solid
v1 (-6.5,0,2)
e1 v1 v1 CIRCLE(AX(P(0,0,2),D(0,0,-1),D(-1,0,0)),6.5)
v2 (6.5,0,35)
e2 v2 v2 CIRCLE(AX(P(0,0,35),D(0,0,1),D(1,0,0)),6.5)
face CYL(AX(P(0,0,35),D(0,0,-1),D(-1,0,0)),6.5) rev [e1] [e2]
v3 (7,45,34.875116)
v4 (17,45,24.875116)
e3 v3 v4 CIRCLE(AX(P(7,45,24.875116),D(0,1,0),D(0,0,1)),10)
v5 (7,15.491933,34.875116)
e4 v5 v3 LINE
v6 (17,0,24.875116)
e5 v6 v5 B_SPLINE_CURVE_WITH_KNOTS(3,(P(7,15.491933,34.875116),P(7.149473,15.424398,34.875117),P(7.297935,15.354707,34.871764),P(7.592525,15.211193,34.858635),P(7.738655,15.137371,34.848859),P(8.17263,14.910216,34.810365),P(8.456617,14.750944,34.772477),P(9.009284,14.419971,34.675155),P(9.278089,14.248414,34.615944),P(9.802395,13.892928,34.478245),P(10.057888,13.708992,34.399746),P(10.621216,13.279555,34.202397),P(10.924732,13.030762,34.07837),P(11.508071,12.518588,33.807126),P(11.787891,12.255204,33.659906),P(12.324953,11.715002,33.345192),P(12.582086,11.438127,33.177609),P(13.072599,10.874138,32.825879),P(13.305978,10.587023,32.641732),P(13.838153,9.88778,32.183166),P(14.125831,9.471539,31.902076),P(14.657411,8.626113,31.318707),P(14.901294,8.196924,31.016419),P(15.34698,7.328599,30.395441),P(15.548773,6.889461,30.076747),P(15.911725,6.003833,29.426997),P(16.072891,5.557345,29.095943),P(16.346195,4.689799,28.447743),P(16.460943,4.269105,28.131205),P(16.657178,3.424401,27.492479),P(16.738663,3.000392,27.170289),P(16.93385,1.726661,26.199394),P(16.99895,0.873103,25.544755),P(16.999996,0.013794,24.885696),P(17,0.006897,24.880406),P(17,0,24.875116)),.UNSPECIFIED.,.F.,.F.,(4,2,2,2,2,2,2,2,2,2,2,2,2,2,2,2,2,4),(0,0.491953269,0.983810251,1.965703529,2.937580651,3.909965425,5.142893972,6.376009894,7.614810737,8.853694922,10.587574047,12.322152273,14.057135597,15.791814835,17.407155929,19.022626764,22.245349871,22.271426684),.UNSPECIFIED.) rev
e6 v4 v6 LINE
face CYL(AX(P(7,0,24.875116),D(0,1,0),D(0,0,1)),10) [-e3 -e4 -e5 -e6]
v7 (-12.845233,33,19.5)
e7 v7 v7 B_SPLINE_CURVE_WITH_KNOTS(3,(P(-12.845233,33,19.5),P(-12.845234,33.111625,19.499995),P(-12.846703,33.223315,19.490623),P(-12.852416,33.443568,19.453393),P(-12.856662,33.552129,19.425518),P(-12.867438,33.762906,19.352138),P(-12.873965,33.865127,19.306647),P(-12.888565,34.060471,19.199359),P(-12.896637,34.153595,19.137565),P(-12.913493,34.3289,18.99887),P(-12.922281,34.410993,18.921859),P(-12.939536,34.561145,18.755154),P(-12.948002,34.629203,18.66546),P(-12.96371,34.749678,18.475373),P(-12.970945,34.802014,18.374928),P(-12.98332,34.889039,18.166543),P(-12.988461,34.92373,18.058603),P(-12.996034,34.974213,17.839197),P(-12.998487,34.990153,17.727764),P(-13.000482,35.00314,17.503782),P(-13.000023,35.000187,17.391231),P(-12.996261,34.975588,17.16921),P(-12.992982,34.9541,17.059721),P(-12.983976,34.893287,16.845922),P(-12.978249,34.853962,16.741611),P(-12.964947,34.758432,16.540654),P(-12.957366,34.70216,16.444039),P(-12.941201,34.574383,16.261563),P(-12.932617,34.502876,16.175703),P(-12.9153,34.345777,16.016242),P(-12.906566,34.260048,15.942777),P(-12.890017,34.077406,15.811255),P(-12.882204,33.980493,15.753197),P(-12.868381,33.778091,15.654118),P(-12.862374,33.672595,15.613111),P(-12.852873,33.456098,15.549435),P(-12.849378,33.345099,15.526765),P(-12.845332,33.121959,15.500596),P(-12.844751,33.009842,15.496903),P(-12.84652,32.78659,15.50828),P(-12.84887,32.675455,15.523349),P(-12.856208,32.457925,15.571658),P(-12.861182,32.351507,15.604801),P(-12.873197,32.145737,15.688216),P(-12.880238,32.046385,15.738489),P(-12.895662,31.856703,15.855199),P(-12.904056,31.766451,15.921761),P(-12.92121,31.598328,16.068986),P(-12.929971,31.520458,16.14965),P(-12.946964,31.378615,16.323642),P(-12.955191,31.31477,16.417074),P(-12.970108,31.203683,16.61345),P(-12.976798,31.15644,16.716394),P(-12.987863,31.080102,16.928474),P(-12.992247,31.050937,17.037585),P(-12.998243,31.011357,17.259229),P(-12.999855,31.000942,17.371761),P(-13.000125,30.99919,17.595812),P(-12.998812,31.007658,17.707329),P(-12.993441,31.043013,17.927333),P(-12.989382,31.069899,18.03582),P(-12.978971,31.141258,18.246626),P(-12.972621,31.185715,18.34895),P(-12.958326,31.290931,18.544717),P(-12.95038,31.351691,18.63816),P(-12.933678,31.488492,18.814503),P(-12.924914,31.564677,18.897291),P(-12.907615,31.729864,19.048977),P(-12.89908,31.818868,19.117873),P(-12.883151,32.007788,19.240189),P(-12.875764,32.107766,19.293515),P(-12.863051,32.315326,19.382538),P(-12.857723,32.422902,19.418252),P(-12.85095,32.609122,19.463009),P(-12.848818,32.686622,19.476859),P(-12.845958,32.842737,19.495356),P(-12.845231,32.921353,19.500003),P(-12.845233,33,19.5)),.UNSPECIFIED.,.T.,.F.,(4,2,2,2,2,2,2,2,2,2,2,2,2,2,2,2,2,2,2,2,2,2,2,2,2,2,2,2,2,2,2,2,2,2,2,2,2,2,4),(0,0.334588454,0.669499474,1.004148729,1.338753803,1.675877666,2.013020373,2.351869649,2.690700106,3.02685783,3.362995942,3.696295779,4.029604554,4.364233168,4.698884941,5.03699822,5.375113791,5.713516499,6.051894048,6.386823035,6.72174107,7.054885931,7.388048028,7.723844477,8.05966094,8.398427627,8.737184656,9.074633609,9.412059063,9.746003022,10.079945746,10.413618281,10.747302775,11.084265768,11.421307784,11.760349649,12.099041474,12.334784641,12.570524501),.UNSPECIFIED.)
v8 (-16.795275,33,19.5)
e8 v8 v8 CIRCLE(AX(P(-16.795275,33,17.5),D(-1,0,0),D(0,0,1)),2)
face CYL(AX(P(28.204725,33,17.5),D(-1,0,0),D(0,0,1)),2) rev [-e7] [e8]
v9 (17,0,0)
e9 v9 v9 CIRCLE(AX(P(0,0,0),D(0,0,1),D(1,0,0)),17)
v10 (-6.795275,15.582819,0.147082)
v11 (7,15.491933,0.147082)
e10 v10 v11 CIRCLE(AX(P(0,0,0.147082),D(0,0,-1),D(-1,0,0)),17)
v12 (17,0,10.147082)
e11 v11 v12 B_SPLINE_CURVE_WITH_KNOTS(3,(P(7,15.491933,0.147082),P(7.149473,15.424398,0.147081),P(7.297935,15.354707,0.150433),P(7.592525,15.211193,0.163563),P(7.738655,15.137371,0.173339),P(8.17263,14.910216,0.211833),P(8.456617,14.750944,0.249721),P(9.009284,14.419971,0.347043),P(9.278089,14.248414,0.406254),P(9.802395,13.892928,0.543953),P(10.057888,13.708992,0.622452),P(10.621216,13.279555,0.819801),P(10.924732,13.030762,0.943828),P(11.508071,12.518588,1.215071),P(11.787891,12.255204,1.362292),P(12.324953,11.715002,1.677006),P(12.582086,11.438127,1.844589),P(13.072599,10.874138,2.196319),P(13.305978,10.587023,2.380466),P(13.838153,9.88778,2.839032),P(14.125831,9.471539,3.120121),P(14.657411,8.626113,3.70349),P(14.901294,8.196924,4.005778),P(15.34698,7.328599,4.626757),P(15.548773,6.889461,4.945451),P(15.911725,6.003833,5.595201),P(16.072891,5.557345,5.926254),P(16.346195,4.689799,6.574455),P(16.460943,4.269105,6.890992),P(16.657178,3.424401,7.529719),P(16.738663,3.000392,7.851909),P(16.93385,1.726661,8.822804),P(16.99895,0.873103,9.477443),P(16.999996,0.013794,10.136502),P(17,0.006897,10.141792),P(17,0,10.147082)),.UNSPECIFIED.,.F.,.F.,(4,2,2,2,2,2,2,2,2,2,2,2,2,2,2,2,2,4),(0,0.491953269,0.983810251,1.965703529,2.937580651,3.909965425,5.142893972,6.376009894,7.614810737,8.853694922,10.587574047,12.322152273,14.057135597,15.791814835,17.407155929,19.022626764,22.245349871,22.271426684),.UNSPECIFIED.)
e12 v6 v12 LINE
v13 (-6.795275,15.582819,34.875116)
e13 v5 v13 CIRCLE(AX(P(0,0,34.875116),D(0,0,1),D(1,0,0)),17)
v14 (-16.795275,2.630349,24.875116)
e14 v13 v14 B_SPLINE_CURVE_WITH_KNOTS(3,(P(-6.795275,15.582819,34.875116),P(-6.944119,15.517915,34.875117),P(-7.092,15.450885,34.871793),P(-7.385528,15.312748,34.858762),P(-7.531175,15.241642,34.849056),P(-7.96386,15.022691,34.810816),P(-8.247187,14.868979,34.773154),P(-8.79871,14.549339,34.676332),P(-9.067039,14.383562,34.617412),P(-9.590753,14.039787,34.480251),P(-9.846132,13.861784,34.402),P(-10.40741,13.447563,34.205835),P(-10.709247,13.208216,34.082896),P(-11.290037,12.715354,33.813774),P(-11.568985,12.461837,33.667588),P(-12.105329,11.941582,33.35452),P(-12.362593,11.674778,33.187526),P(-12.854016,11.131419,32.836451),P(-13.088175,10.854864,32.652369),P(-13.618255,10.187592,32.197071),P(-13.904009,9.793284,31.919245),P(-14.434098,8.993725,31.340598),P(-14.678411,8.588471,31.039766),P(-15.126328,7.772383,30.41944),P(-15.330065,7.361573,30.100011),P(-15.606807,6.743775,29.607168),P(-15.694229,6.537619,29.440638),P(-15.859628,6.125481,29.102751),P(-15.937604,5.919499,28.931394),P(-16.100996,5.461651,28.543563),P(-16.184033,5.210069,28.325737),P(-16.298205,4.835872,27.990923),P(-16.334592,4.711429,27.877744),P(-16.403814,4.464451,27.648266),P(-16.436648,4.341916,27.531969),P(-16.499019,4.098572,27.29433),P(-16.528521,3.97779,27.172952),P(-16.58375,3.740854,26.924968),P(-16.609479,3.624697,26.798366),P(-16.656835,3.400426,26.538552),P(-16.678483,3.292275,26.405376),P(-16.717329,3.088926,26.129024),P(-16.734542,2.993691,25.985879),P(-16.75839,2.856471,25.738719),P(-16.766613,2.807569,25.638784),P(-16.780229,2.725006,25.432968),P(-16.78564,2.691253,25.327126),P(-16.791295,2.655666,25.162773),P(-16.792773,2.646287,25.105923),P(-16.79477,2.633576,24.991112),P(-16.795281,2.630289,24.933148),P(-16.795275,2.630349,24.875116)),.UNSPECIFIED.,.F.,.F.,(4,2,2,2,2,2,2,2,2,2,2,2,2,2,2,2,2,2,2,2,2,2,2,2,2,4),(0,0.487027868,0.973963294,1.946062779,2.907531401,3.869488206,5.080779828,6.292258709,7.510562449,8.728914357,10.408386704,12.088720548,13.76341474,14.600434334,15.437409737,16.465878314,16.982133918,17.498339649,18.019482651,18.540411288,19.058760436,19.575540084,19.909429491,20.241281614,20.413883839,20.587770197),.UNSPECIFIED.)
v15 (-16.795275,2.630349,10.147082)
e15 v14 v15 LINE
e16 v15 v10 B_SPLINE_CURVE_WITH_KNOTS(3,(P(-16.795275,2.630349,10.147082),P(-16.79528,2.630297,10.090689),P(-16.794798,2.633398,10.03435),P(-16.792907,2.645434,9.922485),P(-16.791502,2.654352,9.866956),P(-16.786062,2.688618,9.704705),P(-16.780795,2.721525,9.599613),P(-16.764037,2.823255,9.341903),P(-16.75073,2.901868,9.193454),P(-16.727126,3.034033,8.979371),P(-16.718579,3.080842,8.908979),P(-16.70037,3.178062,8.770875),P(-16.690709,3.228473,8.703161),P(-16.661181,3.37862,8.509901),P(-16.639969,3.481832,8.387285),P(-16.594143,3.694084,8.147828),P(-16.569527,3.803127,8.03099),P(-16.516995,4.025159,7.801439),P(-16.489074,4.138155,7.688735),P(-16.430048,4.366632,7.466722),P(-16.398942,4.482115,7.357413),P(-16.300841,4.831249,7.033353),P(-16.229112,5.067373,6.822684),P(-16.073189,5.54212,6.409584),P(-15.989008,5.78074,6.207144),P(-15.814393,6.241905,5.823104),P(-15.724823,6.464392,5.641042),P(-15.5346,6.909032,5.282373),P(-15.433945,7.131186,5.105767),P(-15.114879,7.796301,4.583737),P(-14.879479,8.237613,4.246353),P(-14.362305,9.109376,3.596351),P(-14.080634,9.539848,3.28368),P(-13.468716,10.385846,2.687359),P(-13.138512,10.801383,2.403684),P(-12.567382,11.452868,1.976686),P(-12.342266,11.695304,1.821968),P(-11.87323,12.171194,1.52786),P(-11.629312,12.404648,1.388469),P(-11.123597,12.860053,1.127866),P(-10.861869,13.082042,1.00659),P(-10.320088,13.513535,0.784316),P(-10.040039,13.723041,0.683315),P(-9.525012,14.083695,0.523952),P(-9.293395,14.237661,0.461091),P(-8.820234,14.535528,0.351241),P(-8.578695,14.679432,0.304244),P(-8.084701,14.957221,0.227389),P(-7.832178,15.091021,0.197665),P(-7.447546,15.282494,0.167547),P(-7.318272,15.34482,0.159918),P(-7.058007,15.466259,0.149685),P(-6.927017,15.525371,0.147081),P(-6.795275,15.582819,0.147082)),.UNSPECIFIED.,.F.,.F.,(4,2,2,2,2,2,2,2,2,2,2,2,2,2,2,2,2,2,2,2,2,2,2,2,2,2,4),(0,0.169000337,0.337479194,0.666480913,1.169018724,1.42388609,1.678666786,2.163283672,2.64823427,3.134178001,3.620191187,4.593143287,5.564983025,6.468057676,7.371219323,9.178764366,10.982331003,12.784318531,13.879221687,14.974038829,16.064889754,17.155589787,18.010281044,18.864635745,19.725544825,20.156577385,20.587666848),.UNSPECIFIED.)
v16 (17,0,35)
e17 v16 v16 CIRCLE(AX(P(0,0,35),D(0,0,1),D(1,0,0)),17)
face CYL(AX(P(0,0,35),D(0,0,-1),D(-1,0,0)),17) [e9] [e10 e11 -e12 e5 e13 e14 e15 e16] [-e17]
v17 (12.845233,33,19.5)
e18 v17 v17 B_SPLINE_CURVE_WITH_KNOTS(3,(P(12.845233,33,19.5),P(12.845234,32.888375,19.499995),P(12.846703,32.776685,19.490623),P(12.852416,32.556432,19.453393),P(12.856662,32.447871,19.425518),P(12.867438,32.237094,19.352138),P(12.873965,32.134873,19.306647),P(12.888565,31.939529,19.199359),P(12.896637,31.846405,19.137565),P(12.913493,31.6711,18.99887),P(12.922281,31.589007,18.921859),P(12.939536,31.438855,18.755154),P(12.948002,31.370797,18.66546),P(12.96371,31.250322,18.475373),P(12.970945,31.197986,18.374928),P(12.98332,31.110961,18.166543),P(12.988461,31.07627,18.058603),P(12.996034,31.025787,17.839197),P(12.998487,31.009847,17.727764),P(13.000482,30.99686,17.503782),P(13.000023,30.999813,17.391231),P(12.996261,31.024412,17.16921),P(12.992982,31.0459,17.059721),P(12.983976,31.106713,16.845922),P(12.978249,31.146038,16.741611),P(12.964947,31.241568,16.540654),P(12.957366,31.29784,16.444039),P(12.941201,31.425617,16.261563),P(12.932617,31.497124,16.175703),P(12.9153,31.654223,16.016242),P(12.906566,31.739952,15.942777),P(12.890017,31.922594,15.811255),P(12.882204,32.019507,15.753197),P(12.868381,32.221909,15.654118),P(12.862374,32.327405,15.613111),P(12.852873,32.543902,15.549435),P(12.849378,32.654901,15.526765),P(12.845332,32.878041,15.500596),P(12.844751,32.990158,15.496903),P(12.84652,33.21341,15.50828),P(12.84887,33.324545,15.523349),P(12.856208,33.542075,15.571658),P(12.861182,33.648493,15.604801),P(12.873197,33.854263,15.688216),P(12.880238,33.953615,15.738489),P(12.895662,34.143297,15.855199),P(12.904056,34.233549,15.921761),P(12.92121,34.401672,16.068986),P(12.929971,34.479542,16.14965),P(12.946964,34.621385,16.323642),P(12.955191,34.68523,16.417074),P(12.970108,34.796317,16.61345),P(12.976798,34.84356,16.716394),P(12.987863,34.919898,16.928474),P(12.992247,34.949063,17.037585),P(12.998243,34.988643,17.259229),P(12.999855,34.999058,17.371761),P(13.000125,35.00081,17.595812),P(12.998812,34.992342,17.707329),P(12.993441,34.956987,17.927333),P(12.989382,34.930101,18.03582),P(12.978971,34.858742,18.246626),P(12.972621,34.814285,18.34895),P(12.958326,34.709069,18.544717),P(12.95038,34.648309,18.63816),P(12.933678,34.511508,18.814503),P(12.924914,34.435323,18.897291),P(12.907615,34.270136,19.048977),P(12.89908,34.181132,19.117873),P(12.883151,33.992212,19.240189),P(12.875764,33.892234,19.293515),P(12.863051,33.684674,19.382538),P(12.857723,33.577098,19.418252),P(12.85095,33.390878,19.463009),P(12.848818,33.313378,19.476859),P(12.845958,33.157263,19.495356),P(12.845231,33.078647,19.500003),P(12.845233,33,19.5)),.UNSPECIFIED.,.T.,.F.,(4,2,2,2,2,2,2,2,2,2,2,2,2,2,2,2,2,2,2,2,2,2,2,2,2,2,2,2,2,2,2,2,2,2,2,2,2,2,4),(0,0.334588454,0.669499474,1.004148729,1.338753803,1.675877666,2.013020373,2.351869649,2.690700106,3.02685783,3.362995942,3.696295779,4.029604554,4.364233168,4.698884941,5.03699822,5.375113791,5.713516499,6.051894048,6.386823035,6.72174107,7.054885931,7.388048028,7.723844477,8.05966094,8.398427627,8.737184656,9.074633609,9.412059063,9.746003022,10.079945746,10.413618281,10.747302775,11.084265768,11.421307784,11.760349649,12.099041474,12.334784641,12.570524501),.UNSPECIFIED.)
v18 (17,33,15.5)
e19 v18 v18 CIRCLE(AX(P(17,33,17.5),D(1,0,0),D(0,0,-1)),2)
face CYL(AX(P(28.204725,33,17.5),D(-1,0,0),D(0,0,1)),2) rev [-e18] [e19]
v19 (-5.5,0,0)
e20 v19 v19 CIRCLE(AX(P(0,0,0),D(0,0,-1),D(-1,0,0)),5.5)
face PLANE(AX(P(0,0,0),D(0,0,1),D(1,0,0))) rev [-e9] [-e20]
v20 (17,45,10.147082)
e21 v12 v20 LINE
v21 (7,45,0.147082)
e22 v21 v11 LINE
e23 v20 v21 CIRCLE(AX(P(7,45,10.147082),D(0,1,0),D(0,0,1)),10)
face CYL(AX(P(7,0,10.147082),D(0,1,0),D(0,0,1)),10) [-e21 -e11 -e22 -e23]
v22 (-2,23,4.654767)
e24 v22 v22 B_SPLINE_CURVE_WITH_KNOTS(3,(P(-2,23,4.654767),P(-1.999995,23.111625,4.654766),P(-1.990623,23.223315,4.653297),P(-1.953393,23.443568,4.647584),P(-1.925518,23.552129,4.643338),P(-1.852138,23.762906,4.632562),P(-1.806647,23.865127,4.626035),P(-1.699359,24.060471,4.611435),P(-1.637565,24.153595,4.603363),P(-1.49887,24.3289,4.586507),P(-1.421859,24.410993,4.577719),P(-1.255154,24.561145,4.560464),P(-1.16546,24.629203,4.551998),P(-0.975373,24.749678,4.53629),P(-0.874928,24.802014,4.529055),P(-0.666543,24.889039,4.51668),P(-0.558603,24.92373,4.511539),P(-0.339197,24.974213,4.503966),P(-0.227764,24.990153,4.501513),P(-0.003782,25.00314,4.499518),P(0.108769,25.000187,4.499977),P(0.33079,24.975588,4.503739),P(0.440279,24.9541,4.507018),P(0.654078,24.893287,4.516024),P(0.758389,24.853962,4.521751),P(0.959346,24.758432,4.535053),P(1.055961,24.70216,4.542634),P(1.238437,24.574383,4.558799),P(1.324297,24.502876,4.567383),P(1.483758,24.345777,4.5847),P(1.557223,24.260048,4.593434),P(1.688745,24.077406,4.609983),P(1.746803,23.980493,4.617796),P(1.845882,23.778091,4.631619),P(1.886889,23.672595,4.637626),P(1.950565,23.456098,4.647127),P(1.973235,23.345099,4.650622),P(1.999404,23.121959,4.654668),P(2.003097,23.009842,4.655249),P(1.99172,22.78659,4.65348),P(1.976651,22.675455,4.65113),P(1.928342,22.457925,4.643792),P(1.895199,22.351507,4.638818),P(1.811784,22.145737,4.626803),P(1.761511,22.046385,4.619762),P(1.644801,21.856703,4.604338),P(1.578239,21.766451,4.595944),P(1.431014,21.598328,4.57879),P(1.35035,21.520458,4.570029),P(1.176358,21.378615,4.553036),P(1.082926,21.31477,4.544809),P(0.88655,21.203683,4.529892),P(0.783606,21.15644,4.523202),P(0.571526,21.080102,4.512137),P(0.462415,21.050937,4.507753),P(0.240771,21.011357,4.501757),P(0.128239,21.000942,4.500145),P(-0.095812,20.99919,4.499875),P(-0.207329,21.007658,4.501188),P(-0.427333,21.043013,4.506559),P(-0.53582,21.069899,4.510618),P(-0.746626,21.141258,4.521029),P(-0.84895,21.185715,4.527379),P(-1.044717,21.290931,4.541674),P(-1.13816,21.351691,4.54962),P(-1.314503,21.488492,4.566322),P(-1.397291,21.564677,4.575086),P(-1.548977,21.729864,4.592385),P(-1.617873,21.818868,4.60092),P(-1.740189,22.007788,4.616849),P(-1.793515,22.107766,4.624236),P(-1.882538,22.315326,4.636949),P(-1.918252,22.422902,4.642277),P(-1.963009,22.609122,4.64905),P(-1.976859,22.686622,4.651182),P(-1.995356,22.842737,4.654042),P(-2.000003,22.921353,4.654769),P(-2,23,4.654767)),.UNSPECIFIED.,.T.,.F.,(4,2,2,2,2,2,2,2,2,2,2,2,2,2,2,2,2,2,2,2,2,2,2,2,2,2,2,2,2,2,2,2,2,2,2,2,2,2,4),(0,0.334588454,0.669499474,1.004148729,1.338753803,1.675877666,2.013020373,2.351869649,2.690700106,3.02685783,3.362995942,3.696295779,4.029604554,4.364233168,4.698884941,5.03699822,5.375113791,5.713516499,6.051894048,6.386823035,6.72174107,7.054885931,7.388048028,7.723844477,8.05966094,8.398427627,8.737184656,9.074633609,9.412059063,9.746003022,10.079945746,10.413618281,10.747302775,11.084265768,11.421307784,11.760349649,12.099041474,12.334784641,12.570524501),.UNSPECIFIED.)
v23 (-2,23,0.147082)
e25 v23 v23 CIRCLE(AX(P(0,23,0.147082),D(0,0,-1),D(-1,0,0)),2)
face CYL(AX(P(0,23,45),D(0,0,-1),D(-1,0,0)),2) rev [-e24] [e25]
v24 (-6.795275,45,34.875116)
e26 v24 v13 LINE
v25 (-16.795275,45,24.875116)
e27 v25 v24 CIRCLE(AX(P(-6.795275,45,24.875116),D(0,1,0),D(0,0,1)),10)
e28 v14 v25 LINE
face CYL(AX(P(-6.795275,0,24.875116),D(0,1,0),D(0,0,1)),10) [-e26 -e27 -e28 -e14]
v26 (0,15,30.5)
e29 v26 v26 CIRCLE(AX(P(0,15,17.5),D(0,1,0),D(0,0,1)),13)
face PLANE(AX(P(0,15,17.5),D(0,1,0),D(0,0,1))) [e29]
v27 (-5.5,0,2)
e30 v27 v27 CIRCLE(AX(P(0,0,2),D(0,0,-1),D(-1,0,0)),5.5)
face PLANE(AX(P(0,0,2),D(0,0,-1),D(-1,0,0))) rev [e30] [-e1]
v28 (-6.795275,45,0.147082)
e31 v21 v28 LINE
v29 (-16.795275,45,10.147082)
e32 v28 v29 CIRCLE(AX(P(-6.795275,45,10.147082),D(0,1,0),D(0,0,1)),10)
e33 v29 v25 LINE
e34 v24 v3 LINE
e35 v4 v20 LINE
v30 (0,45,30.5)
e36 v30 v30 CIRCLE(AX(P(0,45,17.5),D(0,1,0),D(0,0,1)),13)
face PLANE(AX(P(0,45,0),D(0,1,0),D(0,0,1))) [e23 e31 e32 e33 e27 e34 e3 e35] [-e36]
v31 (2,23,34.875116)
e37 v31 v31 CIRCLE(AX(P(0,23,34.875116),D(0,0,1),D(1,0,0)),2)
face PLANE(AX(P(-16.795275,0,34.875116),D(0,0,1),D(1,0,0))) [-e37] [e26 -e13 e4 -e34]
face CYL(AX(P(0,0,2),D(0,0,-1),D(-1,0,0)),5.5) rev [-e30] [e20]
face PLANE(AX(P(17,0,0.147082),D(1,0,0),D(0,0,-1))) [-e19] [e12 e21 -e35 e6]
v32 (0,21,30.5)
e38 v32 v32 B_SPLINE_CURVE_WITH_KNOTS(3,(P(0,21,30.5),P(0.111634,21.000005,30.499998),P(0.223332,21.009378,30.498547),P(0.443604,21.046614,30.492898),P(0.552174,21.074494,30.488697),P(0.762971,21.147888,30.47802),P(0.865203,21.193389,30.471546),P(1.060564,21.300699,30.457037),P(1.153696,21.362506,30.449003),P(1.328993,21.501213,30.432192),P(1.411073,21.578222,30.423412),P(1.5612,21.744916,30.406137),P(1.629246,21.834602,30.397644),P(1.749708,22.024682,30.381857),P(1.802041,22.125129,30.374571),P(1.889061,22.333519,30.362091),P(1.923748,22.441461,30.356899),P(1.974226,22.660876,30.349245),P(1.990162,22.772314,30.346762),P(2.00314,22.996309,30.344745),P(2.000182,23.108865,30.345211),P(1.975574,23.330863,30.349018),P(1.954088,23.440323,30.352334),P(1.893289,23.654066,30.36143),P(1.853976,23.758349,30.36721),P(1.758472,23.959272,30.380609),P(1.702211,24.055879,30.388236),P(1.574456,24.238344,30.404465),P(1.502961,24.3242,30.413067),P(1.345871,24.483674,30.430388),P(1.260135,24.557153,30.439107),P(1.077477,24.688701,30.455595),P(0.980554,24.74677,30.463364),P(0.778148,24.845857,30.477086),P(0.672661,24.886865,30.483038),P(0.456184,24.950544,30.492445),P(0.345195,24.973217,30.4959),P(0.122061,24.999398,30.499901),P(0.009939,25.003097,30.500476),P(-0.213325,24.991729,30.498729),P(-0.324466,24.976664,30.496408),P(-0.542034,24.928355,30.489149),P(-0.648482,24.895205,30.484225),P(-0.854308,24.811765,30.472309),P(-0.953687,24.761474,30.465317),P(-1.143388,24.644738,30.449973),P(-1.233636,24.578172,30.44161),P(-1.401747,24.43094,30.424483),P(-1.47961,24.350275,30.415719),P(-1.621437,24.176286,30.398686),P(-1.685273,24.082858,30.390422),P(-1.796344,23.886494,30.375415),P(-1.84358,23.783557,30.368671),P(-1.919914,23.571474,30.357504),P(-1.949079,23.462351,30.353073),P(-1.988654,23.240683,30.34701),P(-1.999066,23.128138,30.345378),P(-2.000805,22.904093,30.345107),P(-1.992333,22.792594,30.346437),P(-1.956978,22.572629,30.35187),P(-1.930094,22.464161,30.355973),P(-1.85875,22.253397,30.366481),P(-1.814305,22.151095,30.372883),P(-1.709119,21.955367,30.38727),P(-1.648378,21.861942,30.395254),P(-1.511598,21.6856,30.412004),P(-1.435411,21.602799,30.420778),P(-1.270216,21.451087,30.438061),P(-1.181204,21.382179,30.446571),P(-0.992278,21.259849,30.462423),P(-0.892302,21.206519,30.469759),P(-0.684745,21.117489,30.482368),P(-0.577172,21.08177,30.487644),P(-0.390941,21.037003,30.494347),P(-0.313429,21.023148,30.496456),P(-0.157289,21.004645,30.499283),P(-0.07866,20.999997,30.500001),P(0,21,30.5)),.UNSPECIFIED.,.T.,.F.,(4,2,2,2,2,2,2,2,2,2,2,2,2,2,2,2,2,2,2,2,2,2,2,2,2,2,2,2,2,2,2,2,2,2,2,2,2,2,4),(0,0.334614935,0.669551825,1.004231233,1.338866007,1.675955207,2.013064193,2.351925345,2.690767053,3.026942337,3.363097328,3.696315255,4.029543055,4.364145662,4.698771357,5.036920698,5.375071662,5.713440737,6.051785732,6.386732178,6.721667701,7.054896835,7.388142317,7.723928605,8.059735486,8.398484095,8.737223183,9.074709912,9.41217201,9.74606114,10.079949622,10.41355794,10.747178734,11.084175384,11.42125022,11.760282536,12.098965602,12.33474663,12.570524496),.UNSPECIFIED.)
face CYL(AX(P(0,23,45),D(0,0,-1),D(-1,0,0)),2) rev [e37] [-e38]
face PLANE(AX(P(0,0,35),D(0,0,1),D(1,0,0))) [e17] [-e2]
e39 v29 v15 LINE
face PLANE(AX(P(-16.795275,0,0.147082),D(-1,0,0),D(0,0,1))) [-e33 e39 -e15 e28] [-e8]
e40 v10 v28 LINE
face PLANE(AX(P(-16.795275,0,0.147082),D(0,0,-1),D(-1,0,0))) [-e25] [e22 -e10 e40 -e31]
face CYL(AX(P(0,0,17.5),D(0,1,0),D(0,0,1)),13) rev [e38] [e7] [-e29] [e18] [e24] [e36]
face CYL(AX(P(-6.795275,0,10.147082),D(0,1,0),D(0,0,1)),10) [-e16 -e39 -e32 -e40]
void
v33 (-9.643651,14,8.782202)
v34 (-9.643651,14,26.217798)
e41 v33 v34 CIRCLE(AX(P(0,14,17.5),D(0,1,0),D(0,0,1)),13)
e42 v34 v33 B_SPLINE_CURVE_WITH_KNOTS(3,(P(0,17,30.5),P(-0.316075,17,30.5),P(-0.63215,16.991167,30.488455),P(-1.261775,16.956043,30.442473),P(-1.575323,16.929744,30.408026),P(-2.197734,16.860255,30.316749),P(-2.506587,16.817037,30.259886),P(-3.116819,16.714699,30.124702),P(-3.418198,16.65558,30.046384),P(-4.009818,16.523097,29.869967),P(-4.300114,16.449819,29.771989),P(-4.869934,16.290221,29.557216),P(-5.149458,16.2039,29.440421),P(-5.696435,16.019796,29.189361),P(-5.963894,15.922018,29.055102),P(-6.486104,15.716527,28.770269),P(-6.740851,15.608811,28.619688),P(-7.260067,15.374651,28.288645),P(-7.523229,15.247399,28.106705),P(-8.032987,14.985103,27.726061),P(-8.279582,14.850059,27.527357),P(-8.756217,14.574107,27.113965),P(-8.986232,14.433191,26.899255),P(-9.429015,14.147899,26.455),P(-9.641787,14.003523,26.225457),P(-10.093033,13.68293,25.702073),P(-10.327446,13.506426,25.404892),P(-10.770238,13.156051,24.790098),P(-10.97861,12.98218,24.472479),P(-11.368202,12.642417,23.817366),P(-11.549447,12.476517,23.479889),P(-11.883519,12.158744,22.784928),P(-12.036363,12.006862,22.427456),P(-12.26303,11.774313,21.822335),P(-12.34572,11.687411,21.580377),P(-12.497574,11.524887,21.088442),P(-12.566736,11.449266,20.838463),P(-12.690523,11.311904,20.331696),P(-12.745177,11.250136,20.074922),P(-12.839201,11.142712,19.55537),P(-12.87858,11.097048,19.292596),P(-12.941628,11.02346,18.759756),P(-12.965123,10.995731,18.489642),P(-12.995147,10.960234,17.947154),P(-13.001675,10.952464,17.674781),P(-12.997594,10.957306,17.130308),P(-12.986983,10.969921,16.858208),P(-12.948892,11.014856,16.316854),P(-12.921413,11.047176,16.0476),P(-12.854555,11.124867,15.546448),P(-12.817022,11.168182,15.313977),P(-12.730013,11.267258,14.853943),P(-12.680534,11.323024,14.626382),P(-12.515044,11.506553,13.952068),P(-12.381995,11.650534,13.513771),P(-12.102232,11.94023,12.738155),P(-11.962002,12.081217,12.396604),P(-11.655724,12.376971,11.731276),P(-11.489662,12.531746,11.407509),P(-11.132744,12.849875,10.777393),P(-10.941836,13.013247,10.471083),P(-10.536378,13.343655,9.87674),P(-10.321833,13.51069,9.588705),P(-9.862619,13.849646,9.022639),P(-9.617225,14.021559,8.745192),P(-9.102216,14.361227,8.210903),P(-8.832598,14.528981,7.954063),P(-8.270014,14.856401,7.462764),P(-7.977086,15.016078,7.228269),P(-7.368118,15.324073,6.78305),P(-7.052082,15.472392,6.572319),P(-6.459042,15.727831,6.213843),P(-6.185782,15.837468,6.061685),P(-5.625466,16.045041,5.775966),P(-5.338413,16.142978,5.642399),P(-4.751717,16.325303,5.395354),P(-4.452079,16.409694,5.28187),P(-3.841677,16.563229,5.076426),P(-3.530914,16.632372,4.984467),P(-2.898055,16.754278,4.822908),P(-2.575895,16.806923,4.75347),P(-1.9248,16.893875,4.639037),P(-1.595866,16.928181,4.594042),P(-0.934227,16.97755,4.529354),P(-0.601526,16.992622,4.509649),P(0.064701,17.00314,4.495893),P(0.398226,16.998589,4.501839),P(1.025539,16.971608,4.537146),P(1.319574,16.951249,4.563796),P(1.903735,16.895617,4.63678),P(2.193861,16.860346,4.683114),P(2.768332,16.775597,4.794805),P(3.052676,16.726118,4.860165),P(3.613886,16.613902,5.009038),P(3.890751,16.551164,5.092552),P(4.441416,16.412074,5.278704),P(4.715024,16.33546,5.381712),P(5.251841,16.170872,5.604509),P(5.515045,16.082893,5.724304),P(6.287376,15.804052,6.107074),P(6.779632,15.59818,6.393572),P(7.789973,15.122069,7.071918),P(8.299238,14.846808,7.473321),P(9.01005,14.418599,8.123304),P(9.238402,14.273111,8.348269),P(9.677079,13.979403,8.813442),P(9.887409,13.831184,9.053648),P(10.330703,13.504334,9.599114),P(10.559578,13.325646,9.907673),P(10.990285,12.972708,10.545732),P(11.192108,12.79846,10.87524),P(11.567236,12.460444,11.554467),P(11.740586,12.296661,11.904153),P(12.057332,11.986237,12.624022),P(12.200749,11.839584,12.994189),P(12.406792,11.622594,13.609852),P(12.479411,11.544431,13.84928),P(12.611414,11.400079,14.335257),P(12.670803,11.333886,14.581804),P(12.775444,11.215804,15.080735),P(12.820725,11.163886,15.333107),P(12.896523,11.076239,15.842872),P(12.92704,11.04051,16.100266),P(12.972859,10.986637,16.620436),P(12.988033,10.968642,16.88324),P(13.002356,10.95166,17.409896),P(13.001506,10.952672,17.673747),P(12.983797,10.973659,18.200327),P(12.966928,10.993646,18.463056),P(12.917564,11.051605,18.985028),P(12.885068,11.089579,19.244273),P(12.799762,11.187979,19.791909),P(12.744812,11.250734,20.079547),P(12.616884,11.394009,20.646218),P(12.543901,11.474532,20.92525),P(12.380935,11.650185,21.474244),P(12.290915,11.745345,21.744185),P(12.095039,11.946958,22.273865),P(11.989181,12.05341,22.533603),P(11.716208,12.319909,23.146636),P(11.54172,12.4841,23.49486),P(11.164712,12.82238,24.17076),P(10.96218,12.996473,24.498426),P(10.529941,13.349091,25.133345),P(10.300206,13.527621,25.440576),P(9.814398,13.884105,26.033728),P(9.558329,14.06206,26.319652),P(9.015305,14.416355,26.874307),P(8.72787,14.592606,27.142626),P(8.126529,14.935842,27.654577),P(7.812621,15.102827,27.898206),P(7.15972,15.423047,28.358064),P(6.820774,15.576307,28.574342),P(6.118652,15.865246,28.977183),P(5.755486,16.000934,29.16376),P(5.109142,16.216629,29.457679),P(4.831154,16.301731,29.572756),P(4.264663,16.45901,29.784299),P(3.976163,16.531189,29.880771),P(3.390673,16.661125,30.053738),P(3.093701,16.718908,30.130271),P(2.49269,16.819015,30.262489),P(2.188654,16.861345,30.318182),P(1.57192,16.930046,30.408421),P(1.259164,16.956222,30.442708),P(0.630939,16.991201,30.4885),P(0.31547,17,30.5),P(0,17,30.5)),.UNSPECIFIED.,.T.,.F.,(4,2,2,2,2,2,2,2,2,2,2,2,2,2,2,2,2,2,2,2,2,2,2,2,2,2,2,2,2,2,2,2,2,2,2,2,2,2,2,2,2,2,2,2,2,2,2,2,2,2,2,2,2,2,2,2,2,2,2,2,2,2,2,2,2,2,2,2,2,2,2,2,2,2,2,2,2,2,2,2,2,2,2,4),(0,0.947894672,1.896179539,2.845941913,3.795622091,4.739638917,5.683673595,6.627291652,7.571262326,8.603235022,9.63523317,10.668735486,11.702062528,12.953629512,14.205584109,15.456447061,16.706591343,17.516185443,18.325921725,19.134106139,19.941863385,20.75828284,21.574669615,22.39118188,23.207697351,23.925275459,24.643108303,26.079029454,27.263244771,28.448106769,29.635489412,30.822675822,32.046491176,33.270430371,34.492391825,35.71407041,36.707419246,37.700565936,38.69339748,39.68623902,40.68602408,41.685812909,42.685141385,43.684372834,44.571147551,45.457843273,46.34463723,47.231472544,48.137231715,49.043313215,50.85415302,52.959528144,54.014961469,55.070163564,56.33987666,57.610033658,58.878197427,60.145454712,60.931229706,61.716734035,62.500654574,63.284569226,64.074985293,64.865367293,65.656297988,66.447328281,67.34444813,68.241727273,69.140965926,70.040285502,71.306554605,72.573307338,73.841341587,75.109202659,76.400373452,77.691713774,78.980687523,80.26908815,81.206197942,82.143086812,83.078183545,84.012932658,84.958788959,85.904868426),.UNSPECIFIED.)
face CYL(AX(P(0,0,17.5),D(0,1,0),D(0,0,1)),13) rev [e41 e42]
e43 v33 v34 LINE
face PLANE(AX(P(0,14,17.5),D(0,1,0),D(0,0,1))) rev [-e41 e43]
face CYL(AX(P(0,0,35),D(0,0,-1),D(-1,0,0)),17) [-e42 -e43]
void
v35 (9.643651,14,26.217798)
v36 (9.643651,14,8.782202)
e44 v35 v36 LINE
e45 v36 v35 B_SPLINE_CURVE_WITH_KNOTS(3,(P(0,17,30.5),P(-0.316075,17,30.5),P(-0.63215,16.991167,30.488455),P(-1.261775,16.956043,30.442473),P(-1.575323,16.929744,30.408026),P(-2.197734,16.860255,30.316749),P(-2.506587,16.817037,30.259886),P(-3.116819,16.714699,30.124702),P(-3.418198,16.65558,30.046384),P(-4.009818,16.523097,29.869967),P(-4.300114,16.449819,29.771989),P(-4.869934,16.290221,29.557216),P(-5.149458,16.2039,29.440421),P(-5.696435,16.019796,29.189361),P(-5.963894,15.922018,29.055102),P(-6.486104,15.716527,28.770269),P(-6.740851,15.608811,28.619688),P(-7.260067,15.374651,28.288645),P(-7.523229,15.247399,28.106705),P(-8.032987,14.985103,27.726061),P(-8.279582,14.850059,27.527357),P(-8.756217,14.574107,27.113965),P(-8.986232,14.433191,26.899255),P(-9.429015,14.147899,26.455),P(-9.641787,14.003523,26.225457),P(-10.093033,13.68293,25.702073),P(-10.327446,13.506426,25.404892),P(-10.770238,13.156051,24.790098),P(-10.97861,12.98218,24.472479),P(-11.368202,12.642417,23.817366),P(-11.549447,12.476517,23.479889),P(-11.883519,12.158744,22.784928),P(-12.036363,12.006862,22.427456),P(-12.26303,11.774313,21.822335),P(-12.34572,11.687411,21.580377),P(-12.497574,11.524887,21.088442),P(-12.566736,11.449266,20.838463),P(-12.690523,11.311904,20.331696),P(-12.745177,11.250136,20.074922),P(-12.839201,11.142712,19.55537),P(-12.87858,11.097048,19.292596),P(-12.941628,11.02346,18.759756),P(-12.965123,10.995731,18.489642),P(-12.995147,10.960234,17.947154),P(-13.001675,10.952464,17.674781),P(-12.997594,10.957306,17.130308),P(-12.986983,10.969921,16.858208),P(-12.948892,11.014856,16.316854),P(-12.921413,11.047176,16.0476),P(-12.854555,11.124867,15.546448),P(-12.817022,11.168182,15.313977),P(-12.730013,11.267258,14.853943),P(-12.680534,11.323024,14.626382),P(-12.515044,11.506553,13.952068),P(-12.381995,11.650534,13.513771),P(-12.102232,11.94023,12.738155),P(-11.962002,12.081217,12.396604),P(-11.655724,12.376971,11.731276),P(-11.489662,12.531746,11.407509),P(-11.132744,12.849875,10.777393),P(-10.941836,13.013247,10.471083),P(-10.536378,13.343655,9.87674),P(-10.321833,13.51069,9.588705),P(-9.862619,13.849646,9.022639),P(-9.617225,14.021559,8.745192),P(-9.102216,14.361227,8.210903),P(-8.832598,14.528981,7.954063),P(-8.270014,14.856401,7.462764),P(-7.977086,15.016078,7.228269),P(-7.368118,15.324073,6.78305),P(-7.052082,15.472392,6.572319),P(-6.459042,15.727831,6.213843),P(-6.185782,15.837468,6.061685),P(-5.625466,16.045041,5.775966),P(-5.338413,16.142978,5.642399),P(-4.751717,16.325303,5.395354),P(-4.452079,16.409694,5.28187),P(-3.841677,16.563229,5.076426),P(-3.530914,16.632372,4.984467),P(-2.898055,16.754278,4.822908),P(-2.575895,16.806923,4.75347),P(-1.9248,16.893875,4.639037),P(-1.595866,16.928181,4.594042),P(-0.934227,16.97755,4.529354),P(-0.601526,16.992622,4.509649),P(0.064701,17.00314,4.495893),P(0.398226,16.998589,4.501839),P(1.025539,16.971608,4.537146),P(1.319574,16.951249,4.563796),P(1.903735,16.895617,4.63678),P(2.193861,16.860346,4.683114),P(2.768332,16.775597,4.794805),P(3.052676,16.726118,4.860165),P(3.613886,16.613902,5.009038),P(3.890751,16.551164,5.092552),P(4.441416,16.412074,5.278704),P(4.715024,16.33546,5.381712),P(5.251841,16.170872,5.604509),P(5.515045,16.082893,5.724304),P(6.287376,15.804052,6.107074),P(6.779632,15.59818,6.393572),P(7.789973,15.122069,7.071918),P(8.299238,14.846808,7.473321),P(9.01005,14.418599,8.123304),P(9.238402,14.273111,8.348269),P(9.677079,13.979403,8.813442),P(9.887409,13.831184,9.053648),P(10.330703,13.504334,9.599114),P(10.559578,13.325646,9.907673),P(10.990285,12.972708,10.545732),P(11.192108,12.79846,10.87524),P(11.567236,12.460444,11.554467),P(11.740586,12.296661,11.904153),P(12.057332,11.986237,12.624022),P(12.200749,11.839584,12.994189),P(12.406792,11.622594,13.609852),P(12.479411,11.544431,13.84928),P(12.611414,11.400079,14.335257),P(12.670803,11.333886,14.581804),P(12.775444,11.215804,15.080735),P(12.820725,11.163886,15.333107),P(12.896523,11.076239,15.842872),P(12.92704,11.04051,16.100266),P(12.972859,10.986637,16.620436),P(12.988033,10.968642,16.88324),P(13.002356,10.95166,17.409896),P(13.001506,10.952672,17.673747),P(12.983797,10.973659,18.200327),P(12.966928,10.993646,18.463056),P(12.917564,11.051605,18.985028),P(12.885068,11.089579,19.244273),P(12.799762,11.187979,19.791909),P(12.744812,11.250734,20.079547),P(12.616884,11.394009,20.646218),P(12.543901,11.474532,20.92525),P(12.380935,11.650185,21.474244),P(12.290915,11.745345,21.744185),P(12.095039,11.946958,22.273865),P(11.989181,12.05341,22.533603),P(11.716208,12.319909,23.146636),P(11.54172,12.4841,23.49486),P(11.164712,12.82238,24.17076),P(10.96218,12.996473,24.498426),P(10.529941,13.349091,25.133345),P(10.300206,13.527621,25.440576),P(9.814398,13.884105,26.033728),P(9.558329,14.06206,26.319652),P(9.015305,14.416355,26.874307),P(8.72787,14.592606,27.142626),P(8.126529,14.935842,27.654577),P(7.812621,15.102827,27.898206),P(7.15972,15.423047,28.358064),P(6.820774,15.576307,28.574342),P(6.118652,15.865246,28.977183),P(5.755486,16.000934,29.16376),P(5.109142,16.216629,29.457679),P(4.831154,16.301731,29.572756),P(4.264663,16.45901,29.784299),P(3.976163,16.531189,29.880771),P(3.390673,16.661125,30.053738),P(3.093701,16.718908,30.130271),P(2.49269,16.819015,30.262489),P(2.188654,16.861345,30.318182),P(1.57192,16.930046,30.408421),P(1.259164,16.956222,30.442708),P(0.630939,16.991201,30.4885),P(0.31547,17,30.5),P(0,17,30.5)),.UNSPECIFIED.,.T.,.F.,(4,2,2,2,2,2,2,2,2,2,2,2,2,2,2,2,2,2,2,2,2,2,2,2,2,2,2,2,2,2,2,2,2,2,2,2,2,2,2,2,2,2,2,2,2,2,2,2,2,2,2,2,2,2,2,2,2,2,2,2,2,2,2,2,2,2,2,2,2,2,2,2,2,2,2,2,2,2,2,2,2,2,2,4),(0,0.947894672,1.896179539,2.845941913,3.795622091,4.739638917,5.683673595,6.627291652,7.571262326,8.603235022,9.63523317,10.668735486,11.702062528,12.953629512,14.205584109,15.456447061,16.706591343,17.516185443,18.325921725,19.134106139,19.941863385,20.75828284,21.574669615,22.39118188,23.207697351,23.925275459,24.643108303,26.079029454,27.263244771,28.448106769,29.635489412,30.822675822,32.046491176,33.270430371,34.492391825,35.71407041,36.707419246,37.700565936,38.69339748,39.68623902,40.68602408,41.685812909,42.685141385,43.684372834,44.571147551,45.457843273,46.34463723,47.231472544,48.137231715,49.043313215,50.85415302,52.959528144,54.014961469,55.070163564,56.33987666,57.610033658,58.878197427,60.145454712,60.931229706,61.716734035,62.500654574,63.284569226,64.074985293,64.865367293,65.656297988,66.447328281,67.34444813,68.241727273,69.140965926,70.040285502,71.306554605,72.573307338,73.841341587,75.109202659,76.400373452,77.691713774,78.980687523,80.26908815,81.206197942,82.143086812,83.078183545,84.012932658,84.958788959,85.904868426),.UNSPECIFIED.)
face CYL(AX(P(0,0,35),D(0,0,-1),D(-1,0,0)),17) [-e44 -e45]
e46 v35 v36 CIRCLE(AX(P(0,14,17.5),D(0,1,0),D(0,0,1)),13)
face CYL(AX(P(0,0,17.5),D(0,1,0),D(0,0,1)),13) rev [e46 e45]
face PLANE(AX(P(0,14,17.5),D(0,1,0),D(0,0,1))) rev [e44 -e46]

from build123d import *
from build123d.topology import SkipClean

# Parameters (mm, degrees)
SKETCH_1_R           = 17
SKETCH_1_R_2         = 6.5
EXTRUDE_2_DEPTH      = 35
SKETCH_3_W           = 33.795275063
SKETCH_3_H           = 34.72803434
SKETCH_3_R           = 13
EXTRUDE_7_DEPTH      = 45
SKETCH_4_R           = 6.5
CUT_EXTRUDE_1_DEPTH  = 60.489495005
SKETCH_12_R          = 2
CUT_EXTRUDE_11_DEPTH = 45
SKETCH_15_R          = 2
CUT_EXTRUDE_12_DEPTH = 45
FILLET_4_R           = 10
SKETCH_20_R          = 13
CUT_EXTRUDE_18_DEPTH = 31
EXTRUDE_START        = 1
SKETCH_25_R          = 13
EXTRUDE_10_DEPTH     = 1
SKETCH_26_R          = 6.5
SKETCH_26_R_2        = 5.5
EXTRUDE_11_DEPTH     = 2


with BuildPart() as part:
    # Эскиз1 → Бобышка-Вытянуть2 (new body)
    with BuildSketch(Plane.XY):
        Circle(SKETCH_1_R)
        Circle(SKETCH_1_R_2, mode=Mode.SUBTRACT)
    extrude(amount=EXTRUDE_2_DEPTH)

    # Эскиз3 → Бобышка-Вытянуть7 (add)
    with BuildSketch(Plane(origin=(0, 45, 0), x_dir=(1, 0, 0), z_dir=(0, 1, 0))):
        with Locations((0.102362468, -17.511098906)):
            Rectangle(SKETCH_3_W, SKETCH_3_H)
        with Locations(Location((0, -17.5, 0), (0, 0, 270))):
            Circle(SKETCH_3_R, mode=Mode.SUBTRACT)
    extrude(amount=-EXTRUDE_7_DEPTH)

    # Эскиз4 → Вырез-Вытянуть1 (cut, through all)
    with BuildSketch(Plane(origin=(0, 0, 0), x_dir=(-1, 0, 0), z_dir=(0, 0, -1))):
        with Locations(Location((0, 0, 0), (0, 0, 180))):
            Circle(SKETCH_4_R)
    extrude(amount=-CUT_EXTRUDE_1_DEPTH, mode=Mode.SUBTRACT)

    # Эскиз12 → Вырез-Вытянуть11 (cut)
    with BuildSketch(Plane(origin=(0, 0, 0), x_dir=(-1, 0, 0), z_dir=(0, 0, -1))):
        with Locations((0, 23)):
            Circle(SKETCH_12_R)
    extrude(amount=-CUT_EXTRUDE_11_DEPTH, mode=Mode.SUBTRACT)

    # Эскиз15 → Вырез-Вытянуть12 (cut)
    with BuildSketch(Plane.ZY.offset(16.795275063)):
        with Locations((17.5, 33)):
            Circle(SKETCH_15_R)
    extrude(amount=-CUT_EXTRUDE_12_DEPTH, mode=Mode.SUBTRACT)

    # Скругление4
    # the kernel refuses this fillet: 10 mm, written as the material it takes off along each edge
    with BuildSketch(Plane(origin=(-16.795275063, 70, 34.875116076), x_dir=(1, 0, 0), z_dir=(0, -1, 0))) as fillet_4_piece_1_section:
        with BuildLine():
            CenterArc((FILLET_4_R, -FILLET_4_R), FILLET_4_R, 90, 90)
            Line((0, -FILLET_4_R), (0, 0))
            Line((0, 0), (FILLET_4_R, 0))
        make_face()
    fillet_4_piece_1 = extrude(amount=92.369651061, mode=Mode.PRIVATE)
    fillet_4_piece_1 = fillet_4_piece_1 - Plane(origin=(0, 0, 32.54483178), x_dir=(1, 0, 0), z_dir=(0, 0, -1)) * Cylinder(17, 225, mode=Mode.PRIVATE)
    add(fillet_4_piece_1, mode=Mode.SUBTRACT)
    with BuildSketch(Plane(origin=(17, 70, 0.147081736), x_dir=(0, 0, 1), z_dir=(0, -1, 0))) as fillet_4_piece_2_section:
        with BuildLine():
            CenterArc((FILLET_4_R, FILLET_4_R), FILLET_4_R, 180, 90)
            Line((0, FILLET_4_R), (0, 0))
            Line((0, 0), (FILLET_4_R, 0))
        make_face()
    fillet_4_piece_2 = extrude(amount=95, mode=Mode.PRIVATE)
    fillet_4_piece_2 = fillet_4_piece_2 - Plane(origin=(0, 0, 2.486350956), x_dir=(1, 0, 0), z_dir=(0, 0, -1)) * Cylinder(17, 230, mode=Mode.PRIVATE)
    add(fillet_4_piece_2, mode=Mode.SUBTRACT)
    with BuildSketch(Plane(origin=(17, 70, 34.875116076), x_dir=(0, 0, -1), z_dir=(0, -1, 0))) as fillet_4_piece_3_section:
        with BuildLine():
            CenterArc((FILLET_4_R, -FILLET_4_R), FILLET_4_R, 90, 90)
            Line((0, -FILLET_4_R), (0, 0))
            Line((0, 0), (FILLET_4_R, 0))
        make_face()
    fillet_4_piece_3 = extrude(amount=95, mode=Mode.PRIVATE)
    fillet_4_piece_3 = fillet_4_piece_3 - Plane(origin=(0, 0, 32.535846855), x_dir=(1, 0, 0), z_dir=(0, 0, -1)) * Cylinder(17, 230, mode=Mode.PRIVATE)
    add(fillet_4_piece_3, mode=Mode.SUBTRACT)
    with BuildSketch(Plane(origin=(-16.795275063, 70, 0.147081736), x_dir=(0, 0, 1), z_dir=(0, -1, 0))) as fillet_4_piece_4_section:
        with BuildLine():
            CenterArc((FILLET_4_R, -FILLET_4_R), FILLET_4_R, 90, 90)
            Line((0, -FILLET_4_R), (0, 0))
            Line((0, 0), (FILLET_4_R, 0))
        make_face()
    fillet_4_piece_4 = extrude(amount=92.369651061, mode=Mode.PRIVATE)
    fillet_4_piece_4 = fillet_4_piece_4 - Plane(origin=(0, 0, 2.477367304), x_dir=(1, 0, 0), z_dir=(0, 0, -1)) * Cylinder(17, 225, mode=Mode.PRIVATE)
    add(fillet_4_piece_4, mode=Mode.SUBTRACT)

    # Эскиз20 → Вырез-Вытянуть18 (cut)
    with SkipClean():  # the faces are left unmerged after this step: merging them gives an invalid solid
        with BuildSketch(Plane(origin=(0, 45, 0), x_dir=(1, 0, 0), z_dir=(0, 1, 0))):
            with Locations(Location((0, -17.5, 0), (0, 0, 270))):
                Circle(SKETCH_20_R)
        extrude(amount=-CUT_EXTRUDE_18_DEPTH, mode=Mode.SUBTRACT)

    # Эскиз25 → Бобышка-Вытянуть10 (add)
    with BuildSketch(Plane(origin=(0, 14, 0), x_dir=(1, 0, 0), z_dir=(0, 1, 0)).offset(EXTRUDE_START)):
        with Locations(Location((0, -17.5, 0), (0, 0, 270))):
            Circle(SKETCH_25_R)
    extrude(amount=-EXTRUDE_10_DEPTH)

    # Эскиз26 → Бобышка-Вытянуть11 (add)
    with BuildSketch(Plane(origin=(0, 0, 0), x_dir=(-1, 0, 0), z_dir=(0, 0, -1))):
        Circle(SKETCH_26_R)
        Circle(SKETCH_26_R_2, mode=Mode.SUBTRACT)
    extrude(amount=-EXTRUDE_11_DEPTH)


solid = part.part
